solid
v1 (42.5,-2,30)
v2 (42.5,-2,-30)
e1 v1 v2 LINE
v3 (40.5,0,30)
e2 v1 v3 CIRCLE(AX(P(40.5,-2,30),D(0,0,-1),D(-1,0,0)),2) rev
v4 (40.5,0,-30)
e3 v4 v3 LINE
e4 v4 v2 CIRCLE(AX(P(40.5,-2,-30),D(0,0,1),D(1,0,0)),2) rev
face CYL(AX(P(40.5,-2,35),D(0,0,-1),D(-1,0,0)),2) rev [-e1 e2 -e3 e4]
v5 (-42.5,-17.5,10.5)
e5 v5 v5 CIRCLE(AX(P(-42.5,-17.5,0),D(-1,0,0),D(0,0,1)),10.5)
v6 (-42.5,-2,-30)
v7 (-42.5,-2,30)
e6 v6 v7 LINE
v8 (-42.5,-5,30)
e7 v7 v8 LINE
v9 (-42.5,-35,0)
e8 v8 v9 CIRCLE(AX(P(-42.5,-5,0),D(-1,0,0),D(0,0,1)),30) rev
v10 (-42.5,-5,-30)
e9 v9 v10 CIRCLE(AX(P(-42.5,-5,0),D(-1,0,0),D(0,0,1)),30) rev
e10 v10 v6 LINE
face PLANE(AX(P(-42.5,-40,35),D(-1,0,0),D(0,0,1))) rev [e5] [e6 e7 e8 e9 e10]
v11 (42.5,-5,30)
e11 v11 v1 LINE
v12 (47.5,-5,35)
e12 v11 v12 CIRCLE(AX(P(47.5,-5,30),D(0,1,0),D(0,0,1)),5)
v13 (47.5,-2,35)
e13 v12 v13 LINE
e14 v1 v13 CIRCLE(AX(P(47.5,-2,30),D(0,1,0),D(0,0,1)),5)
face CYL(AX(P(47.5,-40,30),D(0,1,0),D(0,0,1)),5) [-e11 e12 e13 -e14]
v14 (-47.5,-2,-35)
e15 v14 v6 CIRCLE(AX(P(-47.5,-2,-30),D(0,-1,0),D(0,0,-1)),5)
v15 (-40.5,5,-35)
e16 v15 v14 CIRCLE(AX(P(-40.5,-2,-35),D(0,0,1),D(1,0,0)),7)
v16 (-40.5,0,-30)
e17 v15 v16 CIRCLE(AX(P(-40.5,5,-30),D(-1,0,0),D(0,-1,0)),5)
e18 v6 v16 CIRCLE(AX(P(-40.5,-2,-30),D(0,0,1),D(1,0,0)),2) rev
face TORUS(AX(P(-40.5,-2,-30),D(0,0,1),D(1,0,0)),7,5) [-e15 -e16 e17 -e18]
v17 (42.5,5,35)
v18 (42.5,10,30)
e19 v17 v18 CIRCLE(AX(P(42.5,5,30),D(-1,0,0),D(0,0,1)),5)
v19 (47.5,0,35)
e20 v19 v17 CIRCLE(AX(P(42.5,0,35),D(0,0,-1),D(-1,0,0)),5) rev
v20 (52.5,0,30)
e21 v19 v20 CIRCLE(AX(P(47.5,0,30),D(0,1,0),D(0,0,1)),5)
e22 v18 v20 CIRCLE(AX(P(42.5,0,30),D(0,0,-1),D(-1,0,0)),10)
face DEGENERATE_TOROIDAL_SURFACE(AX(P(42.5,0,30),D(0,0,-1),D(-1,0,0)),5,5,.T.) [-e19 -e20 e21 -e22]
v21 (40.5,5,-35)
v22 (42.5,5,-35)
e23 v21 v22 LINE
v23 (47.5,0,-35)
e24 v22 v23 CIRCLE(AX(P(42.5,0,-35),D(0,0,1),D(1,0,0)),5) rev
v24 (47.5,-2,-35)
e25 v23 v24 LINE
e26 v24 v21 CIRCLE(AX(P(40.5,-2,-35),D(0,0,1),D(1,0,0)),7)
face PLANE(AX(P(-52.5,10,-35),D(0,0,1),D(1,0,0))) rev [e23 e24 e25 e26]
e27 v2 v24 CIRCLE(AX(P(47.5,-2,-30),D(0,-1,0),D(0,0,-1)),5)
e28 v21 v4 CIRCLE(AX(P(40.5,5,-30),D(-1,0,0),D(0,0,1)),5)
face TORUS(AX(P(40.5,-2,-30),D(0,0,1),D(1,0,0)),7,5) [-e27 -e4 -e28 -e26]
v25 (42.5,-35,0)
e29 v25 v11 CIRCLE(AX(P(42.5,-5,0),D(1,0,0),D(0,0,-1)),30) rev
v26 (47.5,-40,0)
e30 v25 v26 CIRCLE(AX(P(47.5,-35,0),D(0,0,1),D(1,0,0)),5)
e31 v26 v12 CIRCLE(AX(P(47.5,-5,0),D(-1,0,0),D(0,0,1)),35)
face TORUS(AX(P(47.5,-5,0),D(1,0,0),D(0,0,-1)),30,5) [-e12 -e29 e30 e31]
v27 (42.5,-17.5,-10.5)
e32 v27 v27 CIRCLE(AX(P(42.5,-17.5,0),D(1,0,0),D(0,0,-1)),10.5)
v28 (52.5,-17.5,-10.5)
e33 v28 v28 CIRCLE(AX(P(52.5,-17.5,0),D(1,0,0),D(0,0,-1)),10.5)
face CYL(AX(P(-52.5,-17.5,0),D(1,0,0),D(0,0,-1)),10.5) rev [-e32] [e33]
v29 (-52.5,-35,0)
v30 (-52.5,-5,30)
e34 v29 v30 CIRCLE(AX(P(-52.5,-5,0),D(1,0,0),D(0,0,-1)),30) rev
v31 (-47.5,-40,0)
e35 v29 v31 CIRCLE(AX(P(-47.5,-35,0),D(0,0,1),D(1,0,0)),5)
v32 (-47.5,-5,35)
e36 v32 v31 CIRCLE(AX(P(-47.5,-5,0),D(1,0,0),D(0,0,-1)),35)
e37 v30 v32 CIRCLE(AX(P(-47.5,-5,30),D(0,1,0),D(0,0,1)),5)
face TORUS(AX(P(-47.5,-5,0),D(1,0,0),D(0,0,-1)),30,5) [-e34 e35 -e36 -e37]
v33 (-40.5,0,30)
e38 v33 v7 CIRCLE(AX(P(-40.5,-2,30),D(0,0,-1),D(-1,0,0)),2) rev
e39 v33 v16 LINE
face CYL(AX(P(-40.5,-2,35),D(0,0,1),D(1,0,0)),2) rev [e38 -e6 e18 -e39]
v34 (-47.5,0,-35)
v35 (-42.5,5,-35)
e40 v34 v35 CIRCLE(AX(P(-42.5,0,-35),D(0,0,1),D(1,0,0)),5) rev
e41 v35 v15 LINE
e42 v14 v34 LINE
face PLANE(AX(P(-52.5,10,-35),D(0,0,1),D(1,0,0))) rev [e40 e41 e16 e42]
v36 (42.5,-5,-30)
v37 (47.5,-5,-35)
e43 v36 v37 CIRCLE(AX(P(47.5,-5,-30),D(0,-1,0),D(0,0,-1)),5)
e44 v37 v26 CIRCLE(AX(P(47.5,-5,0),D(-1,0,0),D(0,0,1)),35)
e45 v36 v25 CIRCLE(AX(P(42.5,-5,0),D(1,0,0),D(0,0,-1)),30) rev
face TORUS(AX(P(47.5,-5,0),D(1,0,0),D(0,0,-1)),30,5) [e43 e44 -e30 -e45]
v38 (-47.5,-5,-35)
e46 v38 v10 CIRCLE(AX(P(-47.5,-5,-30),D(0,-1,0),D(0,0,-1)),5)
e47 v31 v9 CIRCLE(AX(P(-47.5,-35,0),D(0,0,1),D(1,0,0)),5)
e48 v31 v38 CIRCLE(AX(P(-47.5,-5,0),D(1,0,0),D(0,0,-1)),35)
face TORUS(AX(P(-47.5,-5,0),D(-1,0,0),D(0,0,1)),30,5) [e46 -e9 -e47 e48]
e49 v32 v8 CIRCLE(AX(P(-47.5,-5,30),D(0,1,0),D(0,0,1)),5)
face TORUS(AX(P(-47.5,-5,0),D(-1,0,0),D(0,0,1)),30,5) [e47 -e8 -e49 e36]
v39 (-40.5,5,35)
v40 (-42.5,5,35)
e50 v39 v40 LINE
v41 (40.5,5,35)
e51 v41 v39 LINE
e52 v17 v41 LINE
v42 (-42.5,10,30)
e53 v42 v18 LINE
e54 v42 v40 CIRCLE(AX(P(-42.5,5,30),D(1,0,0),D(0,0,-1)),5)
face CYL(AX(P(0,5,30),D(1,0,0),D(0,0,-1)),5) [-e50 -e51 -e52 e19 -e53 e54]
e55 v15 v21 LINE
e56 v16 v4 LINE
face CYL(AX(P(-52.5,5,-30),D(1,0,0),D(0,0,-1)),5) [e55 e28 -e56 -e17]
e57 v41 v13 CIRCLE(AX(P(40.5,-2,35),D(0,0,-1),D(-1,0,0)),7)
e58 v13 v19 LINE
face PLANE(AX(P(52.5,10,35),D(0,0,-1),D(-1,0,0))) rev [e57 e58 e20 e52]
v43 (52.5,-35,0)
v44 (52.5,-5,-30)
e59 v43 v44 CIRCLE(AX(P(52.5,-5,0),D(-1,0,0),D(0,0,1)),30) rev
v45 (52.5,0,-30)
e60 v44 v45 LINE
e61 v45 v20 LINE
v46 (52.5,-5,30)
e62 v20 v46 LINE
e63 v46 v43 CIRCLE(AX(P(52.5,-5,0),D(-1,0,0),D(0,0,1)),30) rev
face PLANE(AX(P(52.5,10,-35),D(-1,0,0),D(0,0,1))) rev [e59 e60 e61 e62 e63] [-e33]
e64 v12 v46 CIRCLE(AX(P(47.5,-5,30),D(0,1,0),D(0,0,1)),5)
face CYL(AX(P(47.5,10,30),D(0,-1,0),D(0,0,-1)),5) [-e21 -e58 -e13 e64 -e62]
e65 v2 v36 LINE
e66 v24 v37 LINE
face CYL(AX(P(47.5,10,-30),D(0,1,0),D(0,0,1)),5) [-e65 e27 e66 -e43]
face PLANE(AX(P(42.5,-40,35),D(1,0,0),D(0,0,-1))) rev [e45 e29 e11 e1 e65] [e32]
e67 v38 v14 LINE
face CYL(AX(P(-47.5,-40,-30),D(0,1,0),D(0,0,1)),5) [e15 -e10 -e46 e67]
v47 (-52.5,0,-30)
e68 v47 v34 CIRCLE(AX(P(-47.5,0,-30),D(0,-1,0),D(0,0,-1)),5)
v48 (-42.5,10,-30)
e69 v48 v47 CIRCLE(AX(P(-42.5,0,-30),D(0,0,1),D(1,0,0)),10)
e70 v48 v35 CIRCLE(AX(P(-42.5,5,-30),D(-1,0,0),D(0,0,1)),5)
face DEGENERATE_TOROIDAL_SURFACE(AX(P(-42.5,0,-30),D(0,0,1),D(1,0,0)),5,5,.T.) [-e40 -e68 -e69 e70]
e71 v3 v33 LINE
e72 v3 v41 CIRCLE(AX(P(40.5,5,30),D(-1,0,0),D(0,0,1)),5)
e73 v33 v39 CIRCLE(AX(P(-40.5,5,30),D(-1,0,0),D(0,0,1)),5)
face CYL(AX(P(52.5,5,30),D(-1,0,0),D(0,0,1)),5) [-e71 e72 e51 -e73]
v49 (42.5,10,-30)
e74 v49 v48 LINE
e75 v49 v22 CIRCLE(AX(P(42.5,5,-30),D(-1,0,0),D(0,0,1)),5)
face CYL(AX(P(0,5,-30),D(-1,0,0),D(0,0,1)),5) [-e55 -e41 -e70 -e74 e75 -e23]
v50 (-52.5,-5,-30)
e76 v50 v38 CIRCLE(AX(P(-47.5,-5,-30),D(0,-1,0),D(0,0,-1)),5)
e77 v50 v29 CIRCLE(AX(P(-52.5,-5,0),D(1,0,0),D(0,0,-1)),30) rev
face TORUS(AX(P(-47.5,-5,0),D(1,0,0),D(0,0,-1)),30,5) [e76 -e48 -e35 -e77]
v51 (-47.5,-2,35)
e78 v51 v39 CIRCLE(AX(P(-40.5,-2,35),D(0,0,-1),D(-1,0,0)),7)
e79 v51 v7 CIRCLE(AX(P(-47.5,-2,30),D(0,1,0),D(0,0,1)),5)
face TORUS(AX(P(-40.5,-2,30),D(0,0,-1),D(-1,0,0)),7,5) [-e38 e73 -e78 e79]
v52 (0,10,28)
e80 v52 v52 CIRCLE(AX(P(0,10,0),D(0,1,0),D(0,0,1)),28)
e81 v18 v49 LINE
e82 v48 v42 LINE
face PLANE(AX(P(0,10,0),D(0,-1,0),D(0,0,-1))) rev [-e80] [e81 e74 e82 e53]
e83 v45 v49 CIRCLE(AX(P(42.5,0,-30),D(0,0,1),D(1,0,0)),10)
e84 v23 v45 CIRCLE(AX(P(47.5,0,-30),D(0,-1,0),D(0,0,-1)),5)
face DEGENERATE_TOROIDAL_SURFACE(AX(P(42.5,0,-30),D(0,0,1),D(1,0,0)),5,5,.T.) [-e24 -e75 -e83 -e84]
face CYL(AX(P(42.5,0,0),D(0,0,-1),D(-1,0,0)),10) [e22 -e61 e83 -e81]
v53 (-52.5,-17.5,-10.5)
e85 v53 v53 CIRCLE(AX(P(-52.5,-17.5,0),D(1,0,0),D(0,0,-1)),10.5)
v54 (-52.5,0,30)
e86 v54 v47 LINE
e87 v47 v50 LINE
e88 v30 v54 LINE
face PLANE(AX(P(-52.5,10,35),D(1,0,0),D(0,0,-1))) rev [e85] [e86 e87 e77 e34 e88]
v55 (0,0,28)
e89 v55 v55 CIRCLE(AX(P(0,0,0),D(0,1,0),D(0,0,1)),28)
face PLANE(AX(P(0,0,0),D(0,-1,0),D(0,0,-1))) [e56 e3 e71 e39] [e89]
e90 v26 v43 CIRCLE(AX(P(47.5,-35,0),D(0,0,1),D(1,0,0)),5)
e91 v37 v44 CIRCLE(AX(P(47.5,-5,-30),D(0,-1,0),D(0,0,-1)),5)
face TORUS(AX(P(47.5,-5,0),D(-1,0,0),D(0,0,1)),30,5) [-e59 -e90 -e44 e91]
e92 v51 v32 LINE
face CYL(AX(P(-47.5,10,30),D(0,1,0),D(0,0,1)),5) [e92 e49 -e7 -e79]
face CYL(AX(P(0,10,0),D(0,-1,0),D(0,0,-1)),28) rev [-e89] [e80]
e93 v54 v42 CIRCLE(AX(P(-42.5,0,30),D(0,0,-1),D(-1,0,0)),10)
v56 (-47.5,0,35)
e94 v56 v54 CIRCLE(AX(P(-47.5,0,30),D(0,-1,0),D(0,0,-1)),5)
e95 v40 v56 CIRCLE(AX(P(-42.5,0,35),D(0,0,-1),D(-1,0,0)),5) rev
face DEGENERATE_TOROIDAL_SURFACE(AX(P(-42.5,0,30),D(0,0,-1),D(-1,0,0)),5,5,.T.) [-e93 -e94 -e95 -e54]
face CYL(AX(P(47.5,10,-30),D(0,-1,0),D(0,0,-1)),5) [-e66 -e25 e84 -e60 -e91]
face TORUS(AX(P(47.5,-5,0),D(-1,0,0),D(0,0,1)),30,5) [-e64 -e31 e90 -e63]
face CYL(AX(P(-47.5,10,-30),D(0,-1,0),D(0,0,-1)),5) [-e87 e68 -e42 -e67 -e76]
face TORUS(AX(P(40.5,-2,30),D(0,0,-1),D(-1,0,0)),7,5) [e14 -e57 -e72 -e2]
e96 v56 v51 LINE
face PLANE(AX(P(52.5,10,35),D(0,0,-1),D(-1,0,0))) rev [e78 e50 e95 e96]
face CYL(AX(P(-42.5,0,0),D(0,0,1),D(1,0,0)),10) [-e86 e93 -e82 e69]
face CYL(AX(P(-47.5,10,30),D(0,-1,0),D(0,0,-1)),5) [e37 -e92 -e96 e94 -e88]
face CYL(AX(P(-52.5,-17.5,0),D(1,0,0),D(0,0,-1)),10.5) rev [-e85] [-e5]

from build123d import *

# Parameters (mm, degrees)
SKETCH1_W           = 105
SKETCH1_H           = 70
SKETCH1_R           = 28
BOSS_EXTRUDE1_DEPTH = 10
SKETCH3_W           = 10
SKETCH3_H           = 70
BOSS_EXTRUDE2_DEPTH = 40
SKETCH5_R           = 10.5
CUT_EXTRUDE1_DEPTH  = 118.686022959
FILLET1_R           = 35
FILLET2_R           = 10
FILLET3_R           = 2
FILLET4_R           = 5


with BuildPart() as part:
    # Sketch1 → Boss-Extrude1 (new body)
    with BuildSketch(Plane(origin=(0, 0, 0), x_dir=(1, 0, 0), z_dir=(0, 1, 0))):
        Rectangle(SKETCH1_W, SKETCH1_H)
        with Locations(Location((0, 0, 0), (0, 0, 270))):
            Circle(SKETCH1_R, mode=Mode.SUBTRACT)
    extrude(amount=BOSS_EXTRUDE1_DEPTH)

    # Sketch3 → Boss-Extrude2 (add)
    with BuildSketch(Plane.XZ):
        with Locations((-47.5, 0)):
            Rectangle(SKETCH3_W, SKETCH3_H)
        with Locations((47.5, 0)):
            Rectangle(SKETCH3_W, SKETCH3_H)
    extrude(amount=BOSS_EXTRUDE2_DEPTH)

    # Sketch5 → Cut-Extrude1 (cut, through all)
    with BuildSketch(Plane(origin=(52.5, 0, 0), x_dir=(0, 0, -1), z_dir=(1, 0, 0))):
        with Locations((0, -17.5)):
            Circle(SKETCH5_R)
    extrude(amount=-CUT_EXTRUDE1_DEPTH, mode=Mode.SUBTRACT)

    # Fillet1
    fillet1_edges = [part.edges().sort_by_distance(p)[0] for p in [
        (47.5, -40, 35),
        (47.5, -40, -35),
        (-47.5, -40, 35),
        (-47.5, -40, -35),
    ]]
    fillet(fillet1_edges, radius=FILLET1_R - 0.0001)  # a hair under: the kernel refuses the full size

    # Fillet2
    fillet2_edges = [part.edges().sort_by_distance(p)[0] for p in [
        (52.5, 10, 0),
        (-52.5, 10, 0),
    ]]
    fillet(fillet2_edges, radius=FILLET2_R)

    # Fillet3
    fillet3_edges = [part.edges().sort_by_distance(p)[0] for p in [
        (-42.5, 0, 0),
        (42.5, 0, 0),
    ]]
    fillet(fillet3_edges, radius=FILLET3_R)

    # Fillet4
    fillet4_edges = [part.edges().sort_by_distance(p)[0] for p in [
        (-41.914213562, -0.585786438, 35),
        (-42.5, -29.748766631, 24.748766631),
        (-42.5, -29.748766631, -24.748766631),
        (-41.914213562, -0.585786438, -35),
        (0, 0, -35),
        (41.914213562, -0.585786438, -35),
        (42.5, -29.748766631, -24.748766631),
        (42.5, -29.748766631, 24.748766631),
        (41.914213562, -0.585786438, 35),
        (-49.571067812, 7.071067812, 35),
        (-52.5, -2.50005, 35),
        (-52.5, -29.748766631, 24.748766631),
        (-52.5, -29.748766631, -24.748766631),
        (-52.5, -2.50005, -35),
        (-49.571067812, 7.071067812, -35),
        (0, 10, -35),
        (49.571067812, 7.071067812, -35),
        (52.5, -2.50005, -35),
        (52.5, -29.748766631, -24.748766631),
        (52.5, -29.748766631, 24.748766631),
        (52.5, -2.50005, 35),
        (49.571067812, 7.071067812, 35),
        (0, 0, 35),
        (0, 10, 35),
        (-42.5, -3.50005, 35),
        (-42.5, -3.50005, -35),
        (42.5, -3.50005, -35),
        (42.5, -3.50005, 35),
    ]]
    fillet(fillet4_edges, radius=FILLET4_R - 0.0001)  # a hair under: the kernel refuses the full size


solid = part.part
